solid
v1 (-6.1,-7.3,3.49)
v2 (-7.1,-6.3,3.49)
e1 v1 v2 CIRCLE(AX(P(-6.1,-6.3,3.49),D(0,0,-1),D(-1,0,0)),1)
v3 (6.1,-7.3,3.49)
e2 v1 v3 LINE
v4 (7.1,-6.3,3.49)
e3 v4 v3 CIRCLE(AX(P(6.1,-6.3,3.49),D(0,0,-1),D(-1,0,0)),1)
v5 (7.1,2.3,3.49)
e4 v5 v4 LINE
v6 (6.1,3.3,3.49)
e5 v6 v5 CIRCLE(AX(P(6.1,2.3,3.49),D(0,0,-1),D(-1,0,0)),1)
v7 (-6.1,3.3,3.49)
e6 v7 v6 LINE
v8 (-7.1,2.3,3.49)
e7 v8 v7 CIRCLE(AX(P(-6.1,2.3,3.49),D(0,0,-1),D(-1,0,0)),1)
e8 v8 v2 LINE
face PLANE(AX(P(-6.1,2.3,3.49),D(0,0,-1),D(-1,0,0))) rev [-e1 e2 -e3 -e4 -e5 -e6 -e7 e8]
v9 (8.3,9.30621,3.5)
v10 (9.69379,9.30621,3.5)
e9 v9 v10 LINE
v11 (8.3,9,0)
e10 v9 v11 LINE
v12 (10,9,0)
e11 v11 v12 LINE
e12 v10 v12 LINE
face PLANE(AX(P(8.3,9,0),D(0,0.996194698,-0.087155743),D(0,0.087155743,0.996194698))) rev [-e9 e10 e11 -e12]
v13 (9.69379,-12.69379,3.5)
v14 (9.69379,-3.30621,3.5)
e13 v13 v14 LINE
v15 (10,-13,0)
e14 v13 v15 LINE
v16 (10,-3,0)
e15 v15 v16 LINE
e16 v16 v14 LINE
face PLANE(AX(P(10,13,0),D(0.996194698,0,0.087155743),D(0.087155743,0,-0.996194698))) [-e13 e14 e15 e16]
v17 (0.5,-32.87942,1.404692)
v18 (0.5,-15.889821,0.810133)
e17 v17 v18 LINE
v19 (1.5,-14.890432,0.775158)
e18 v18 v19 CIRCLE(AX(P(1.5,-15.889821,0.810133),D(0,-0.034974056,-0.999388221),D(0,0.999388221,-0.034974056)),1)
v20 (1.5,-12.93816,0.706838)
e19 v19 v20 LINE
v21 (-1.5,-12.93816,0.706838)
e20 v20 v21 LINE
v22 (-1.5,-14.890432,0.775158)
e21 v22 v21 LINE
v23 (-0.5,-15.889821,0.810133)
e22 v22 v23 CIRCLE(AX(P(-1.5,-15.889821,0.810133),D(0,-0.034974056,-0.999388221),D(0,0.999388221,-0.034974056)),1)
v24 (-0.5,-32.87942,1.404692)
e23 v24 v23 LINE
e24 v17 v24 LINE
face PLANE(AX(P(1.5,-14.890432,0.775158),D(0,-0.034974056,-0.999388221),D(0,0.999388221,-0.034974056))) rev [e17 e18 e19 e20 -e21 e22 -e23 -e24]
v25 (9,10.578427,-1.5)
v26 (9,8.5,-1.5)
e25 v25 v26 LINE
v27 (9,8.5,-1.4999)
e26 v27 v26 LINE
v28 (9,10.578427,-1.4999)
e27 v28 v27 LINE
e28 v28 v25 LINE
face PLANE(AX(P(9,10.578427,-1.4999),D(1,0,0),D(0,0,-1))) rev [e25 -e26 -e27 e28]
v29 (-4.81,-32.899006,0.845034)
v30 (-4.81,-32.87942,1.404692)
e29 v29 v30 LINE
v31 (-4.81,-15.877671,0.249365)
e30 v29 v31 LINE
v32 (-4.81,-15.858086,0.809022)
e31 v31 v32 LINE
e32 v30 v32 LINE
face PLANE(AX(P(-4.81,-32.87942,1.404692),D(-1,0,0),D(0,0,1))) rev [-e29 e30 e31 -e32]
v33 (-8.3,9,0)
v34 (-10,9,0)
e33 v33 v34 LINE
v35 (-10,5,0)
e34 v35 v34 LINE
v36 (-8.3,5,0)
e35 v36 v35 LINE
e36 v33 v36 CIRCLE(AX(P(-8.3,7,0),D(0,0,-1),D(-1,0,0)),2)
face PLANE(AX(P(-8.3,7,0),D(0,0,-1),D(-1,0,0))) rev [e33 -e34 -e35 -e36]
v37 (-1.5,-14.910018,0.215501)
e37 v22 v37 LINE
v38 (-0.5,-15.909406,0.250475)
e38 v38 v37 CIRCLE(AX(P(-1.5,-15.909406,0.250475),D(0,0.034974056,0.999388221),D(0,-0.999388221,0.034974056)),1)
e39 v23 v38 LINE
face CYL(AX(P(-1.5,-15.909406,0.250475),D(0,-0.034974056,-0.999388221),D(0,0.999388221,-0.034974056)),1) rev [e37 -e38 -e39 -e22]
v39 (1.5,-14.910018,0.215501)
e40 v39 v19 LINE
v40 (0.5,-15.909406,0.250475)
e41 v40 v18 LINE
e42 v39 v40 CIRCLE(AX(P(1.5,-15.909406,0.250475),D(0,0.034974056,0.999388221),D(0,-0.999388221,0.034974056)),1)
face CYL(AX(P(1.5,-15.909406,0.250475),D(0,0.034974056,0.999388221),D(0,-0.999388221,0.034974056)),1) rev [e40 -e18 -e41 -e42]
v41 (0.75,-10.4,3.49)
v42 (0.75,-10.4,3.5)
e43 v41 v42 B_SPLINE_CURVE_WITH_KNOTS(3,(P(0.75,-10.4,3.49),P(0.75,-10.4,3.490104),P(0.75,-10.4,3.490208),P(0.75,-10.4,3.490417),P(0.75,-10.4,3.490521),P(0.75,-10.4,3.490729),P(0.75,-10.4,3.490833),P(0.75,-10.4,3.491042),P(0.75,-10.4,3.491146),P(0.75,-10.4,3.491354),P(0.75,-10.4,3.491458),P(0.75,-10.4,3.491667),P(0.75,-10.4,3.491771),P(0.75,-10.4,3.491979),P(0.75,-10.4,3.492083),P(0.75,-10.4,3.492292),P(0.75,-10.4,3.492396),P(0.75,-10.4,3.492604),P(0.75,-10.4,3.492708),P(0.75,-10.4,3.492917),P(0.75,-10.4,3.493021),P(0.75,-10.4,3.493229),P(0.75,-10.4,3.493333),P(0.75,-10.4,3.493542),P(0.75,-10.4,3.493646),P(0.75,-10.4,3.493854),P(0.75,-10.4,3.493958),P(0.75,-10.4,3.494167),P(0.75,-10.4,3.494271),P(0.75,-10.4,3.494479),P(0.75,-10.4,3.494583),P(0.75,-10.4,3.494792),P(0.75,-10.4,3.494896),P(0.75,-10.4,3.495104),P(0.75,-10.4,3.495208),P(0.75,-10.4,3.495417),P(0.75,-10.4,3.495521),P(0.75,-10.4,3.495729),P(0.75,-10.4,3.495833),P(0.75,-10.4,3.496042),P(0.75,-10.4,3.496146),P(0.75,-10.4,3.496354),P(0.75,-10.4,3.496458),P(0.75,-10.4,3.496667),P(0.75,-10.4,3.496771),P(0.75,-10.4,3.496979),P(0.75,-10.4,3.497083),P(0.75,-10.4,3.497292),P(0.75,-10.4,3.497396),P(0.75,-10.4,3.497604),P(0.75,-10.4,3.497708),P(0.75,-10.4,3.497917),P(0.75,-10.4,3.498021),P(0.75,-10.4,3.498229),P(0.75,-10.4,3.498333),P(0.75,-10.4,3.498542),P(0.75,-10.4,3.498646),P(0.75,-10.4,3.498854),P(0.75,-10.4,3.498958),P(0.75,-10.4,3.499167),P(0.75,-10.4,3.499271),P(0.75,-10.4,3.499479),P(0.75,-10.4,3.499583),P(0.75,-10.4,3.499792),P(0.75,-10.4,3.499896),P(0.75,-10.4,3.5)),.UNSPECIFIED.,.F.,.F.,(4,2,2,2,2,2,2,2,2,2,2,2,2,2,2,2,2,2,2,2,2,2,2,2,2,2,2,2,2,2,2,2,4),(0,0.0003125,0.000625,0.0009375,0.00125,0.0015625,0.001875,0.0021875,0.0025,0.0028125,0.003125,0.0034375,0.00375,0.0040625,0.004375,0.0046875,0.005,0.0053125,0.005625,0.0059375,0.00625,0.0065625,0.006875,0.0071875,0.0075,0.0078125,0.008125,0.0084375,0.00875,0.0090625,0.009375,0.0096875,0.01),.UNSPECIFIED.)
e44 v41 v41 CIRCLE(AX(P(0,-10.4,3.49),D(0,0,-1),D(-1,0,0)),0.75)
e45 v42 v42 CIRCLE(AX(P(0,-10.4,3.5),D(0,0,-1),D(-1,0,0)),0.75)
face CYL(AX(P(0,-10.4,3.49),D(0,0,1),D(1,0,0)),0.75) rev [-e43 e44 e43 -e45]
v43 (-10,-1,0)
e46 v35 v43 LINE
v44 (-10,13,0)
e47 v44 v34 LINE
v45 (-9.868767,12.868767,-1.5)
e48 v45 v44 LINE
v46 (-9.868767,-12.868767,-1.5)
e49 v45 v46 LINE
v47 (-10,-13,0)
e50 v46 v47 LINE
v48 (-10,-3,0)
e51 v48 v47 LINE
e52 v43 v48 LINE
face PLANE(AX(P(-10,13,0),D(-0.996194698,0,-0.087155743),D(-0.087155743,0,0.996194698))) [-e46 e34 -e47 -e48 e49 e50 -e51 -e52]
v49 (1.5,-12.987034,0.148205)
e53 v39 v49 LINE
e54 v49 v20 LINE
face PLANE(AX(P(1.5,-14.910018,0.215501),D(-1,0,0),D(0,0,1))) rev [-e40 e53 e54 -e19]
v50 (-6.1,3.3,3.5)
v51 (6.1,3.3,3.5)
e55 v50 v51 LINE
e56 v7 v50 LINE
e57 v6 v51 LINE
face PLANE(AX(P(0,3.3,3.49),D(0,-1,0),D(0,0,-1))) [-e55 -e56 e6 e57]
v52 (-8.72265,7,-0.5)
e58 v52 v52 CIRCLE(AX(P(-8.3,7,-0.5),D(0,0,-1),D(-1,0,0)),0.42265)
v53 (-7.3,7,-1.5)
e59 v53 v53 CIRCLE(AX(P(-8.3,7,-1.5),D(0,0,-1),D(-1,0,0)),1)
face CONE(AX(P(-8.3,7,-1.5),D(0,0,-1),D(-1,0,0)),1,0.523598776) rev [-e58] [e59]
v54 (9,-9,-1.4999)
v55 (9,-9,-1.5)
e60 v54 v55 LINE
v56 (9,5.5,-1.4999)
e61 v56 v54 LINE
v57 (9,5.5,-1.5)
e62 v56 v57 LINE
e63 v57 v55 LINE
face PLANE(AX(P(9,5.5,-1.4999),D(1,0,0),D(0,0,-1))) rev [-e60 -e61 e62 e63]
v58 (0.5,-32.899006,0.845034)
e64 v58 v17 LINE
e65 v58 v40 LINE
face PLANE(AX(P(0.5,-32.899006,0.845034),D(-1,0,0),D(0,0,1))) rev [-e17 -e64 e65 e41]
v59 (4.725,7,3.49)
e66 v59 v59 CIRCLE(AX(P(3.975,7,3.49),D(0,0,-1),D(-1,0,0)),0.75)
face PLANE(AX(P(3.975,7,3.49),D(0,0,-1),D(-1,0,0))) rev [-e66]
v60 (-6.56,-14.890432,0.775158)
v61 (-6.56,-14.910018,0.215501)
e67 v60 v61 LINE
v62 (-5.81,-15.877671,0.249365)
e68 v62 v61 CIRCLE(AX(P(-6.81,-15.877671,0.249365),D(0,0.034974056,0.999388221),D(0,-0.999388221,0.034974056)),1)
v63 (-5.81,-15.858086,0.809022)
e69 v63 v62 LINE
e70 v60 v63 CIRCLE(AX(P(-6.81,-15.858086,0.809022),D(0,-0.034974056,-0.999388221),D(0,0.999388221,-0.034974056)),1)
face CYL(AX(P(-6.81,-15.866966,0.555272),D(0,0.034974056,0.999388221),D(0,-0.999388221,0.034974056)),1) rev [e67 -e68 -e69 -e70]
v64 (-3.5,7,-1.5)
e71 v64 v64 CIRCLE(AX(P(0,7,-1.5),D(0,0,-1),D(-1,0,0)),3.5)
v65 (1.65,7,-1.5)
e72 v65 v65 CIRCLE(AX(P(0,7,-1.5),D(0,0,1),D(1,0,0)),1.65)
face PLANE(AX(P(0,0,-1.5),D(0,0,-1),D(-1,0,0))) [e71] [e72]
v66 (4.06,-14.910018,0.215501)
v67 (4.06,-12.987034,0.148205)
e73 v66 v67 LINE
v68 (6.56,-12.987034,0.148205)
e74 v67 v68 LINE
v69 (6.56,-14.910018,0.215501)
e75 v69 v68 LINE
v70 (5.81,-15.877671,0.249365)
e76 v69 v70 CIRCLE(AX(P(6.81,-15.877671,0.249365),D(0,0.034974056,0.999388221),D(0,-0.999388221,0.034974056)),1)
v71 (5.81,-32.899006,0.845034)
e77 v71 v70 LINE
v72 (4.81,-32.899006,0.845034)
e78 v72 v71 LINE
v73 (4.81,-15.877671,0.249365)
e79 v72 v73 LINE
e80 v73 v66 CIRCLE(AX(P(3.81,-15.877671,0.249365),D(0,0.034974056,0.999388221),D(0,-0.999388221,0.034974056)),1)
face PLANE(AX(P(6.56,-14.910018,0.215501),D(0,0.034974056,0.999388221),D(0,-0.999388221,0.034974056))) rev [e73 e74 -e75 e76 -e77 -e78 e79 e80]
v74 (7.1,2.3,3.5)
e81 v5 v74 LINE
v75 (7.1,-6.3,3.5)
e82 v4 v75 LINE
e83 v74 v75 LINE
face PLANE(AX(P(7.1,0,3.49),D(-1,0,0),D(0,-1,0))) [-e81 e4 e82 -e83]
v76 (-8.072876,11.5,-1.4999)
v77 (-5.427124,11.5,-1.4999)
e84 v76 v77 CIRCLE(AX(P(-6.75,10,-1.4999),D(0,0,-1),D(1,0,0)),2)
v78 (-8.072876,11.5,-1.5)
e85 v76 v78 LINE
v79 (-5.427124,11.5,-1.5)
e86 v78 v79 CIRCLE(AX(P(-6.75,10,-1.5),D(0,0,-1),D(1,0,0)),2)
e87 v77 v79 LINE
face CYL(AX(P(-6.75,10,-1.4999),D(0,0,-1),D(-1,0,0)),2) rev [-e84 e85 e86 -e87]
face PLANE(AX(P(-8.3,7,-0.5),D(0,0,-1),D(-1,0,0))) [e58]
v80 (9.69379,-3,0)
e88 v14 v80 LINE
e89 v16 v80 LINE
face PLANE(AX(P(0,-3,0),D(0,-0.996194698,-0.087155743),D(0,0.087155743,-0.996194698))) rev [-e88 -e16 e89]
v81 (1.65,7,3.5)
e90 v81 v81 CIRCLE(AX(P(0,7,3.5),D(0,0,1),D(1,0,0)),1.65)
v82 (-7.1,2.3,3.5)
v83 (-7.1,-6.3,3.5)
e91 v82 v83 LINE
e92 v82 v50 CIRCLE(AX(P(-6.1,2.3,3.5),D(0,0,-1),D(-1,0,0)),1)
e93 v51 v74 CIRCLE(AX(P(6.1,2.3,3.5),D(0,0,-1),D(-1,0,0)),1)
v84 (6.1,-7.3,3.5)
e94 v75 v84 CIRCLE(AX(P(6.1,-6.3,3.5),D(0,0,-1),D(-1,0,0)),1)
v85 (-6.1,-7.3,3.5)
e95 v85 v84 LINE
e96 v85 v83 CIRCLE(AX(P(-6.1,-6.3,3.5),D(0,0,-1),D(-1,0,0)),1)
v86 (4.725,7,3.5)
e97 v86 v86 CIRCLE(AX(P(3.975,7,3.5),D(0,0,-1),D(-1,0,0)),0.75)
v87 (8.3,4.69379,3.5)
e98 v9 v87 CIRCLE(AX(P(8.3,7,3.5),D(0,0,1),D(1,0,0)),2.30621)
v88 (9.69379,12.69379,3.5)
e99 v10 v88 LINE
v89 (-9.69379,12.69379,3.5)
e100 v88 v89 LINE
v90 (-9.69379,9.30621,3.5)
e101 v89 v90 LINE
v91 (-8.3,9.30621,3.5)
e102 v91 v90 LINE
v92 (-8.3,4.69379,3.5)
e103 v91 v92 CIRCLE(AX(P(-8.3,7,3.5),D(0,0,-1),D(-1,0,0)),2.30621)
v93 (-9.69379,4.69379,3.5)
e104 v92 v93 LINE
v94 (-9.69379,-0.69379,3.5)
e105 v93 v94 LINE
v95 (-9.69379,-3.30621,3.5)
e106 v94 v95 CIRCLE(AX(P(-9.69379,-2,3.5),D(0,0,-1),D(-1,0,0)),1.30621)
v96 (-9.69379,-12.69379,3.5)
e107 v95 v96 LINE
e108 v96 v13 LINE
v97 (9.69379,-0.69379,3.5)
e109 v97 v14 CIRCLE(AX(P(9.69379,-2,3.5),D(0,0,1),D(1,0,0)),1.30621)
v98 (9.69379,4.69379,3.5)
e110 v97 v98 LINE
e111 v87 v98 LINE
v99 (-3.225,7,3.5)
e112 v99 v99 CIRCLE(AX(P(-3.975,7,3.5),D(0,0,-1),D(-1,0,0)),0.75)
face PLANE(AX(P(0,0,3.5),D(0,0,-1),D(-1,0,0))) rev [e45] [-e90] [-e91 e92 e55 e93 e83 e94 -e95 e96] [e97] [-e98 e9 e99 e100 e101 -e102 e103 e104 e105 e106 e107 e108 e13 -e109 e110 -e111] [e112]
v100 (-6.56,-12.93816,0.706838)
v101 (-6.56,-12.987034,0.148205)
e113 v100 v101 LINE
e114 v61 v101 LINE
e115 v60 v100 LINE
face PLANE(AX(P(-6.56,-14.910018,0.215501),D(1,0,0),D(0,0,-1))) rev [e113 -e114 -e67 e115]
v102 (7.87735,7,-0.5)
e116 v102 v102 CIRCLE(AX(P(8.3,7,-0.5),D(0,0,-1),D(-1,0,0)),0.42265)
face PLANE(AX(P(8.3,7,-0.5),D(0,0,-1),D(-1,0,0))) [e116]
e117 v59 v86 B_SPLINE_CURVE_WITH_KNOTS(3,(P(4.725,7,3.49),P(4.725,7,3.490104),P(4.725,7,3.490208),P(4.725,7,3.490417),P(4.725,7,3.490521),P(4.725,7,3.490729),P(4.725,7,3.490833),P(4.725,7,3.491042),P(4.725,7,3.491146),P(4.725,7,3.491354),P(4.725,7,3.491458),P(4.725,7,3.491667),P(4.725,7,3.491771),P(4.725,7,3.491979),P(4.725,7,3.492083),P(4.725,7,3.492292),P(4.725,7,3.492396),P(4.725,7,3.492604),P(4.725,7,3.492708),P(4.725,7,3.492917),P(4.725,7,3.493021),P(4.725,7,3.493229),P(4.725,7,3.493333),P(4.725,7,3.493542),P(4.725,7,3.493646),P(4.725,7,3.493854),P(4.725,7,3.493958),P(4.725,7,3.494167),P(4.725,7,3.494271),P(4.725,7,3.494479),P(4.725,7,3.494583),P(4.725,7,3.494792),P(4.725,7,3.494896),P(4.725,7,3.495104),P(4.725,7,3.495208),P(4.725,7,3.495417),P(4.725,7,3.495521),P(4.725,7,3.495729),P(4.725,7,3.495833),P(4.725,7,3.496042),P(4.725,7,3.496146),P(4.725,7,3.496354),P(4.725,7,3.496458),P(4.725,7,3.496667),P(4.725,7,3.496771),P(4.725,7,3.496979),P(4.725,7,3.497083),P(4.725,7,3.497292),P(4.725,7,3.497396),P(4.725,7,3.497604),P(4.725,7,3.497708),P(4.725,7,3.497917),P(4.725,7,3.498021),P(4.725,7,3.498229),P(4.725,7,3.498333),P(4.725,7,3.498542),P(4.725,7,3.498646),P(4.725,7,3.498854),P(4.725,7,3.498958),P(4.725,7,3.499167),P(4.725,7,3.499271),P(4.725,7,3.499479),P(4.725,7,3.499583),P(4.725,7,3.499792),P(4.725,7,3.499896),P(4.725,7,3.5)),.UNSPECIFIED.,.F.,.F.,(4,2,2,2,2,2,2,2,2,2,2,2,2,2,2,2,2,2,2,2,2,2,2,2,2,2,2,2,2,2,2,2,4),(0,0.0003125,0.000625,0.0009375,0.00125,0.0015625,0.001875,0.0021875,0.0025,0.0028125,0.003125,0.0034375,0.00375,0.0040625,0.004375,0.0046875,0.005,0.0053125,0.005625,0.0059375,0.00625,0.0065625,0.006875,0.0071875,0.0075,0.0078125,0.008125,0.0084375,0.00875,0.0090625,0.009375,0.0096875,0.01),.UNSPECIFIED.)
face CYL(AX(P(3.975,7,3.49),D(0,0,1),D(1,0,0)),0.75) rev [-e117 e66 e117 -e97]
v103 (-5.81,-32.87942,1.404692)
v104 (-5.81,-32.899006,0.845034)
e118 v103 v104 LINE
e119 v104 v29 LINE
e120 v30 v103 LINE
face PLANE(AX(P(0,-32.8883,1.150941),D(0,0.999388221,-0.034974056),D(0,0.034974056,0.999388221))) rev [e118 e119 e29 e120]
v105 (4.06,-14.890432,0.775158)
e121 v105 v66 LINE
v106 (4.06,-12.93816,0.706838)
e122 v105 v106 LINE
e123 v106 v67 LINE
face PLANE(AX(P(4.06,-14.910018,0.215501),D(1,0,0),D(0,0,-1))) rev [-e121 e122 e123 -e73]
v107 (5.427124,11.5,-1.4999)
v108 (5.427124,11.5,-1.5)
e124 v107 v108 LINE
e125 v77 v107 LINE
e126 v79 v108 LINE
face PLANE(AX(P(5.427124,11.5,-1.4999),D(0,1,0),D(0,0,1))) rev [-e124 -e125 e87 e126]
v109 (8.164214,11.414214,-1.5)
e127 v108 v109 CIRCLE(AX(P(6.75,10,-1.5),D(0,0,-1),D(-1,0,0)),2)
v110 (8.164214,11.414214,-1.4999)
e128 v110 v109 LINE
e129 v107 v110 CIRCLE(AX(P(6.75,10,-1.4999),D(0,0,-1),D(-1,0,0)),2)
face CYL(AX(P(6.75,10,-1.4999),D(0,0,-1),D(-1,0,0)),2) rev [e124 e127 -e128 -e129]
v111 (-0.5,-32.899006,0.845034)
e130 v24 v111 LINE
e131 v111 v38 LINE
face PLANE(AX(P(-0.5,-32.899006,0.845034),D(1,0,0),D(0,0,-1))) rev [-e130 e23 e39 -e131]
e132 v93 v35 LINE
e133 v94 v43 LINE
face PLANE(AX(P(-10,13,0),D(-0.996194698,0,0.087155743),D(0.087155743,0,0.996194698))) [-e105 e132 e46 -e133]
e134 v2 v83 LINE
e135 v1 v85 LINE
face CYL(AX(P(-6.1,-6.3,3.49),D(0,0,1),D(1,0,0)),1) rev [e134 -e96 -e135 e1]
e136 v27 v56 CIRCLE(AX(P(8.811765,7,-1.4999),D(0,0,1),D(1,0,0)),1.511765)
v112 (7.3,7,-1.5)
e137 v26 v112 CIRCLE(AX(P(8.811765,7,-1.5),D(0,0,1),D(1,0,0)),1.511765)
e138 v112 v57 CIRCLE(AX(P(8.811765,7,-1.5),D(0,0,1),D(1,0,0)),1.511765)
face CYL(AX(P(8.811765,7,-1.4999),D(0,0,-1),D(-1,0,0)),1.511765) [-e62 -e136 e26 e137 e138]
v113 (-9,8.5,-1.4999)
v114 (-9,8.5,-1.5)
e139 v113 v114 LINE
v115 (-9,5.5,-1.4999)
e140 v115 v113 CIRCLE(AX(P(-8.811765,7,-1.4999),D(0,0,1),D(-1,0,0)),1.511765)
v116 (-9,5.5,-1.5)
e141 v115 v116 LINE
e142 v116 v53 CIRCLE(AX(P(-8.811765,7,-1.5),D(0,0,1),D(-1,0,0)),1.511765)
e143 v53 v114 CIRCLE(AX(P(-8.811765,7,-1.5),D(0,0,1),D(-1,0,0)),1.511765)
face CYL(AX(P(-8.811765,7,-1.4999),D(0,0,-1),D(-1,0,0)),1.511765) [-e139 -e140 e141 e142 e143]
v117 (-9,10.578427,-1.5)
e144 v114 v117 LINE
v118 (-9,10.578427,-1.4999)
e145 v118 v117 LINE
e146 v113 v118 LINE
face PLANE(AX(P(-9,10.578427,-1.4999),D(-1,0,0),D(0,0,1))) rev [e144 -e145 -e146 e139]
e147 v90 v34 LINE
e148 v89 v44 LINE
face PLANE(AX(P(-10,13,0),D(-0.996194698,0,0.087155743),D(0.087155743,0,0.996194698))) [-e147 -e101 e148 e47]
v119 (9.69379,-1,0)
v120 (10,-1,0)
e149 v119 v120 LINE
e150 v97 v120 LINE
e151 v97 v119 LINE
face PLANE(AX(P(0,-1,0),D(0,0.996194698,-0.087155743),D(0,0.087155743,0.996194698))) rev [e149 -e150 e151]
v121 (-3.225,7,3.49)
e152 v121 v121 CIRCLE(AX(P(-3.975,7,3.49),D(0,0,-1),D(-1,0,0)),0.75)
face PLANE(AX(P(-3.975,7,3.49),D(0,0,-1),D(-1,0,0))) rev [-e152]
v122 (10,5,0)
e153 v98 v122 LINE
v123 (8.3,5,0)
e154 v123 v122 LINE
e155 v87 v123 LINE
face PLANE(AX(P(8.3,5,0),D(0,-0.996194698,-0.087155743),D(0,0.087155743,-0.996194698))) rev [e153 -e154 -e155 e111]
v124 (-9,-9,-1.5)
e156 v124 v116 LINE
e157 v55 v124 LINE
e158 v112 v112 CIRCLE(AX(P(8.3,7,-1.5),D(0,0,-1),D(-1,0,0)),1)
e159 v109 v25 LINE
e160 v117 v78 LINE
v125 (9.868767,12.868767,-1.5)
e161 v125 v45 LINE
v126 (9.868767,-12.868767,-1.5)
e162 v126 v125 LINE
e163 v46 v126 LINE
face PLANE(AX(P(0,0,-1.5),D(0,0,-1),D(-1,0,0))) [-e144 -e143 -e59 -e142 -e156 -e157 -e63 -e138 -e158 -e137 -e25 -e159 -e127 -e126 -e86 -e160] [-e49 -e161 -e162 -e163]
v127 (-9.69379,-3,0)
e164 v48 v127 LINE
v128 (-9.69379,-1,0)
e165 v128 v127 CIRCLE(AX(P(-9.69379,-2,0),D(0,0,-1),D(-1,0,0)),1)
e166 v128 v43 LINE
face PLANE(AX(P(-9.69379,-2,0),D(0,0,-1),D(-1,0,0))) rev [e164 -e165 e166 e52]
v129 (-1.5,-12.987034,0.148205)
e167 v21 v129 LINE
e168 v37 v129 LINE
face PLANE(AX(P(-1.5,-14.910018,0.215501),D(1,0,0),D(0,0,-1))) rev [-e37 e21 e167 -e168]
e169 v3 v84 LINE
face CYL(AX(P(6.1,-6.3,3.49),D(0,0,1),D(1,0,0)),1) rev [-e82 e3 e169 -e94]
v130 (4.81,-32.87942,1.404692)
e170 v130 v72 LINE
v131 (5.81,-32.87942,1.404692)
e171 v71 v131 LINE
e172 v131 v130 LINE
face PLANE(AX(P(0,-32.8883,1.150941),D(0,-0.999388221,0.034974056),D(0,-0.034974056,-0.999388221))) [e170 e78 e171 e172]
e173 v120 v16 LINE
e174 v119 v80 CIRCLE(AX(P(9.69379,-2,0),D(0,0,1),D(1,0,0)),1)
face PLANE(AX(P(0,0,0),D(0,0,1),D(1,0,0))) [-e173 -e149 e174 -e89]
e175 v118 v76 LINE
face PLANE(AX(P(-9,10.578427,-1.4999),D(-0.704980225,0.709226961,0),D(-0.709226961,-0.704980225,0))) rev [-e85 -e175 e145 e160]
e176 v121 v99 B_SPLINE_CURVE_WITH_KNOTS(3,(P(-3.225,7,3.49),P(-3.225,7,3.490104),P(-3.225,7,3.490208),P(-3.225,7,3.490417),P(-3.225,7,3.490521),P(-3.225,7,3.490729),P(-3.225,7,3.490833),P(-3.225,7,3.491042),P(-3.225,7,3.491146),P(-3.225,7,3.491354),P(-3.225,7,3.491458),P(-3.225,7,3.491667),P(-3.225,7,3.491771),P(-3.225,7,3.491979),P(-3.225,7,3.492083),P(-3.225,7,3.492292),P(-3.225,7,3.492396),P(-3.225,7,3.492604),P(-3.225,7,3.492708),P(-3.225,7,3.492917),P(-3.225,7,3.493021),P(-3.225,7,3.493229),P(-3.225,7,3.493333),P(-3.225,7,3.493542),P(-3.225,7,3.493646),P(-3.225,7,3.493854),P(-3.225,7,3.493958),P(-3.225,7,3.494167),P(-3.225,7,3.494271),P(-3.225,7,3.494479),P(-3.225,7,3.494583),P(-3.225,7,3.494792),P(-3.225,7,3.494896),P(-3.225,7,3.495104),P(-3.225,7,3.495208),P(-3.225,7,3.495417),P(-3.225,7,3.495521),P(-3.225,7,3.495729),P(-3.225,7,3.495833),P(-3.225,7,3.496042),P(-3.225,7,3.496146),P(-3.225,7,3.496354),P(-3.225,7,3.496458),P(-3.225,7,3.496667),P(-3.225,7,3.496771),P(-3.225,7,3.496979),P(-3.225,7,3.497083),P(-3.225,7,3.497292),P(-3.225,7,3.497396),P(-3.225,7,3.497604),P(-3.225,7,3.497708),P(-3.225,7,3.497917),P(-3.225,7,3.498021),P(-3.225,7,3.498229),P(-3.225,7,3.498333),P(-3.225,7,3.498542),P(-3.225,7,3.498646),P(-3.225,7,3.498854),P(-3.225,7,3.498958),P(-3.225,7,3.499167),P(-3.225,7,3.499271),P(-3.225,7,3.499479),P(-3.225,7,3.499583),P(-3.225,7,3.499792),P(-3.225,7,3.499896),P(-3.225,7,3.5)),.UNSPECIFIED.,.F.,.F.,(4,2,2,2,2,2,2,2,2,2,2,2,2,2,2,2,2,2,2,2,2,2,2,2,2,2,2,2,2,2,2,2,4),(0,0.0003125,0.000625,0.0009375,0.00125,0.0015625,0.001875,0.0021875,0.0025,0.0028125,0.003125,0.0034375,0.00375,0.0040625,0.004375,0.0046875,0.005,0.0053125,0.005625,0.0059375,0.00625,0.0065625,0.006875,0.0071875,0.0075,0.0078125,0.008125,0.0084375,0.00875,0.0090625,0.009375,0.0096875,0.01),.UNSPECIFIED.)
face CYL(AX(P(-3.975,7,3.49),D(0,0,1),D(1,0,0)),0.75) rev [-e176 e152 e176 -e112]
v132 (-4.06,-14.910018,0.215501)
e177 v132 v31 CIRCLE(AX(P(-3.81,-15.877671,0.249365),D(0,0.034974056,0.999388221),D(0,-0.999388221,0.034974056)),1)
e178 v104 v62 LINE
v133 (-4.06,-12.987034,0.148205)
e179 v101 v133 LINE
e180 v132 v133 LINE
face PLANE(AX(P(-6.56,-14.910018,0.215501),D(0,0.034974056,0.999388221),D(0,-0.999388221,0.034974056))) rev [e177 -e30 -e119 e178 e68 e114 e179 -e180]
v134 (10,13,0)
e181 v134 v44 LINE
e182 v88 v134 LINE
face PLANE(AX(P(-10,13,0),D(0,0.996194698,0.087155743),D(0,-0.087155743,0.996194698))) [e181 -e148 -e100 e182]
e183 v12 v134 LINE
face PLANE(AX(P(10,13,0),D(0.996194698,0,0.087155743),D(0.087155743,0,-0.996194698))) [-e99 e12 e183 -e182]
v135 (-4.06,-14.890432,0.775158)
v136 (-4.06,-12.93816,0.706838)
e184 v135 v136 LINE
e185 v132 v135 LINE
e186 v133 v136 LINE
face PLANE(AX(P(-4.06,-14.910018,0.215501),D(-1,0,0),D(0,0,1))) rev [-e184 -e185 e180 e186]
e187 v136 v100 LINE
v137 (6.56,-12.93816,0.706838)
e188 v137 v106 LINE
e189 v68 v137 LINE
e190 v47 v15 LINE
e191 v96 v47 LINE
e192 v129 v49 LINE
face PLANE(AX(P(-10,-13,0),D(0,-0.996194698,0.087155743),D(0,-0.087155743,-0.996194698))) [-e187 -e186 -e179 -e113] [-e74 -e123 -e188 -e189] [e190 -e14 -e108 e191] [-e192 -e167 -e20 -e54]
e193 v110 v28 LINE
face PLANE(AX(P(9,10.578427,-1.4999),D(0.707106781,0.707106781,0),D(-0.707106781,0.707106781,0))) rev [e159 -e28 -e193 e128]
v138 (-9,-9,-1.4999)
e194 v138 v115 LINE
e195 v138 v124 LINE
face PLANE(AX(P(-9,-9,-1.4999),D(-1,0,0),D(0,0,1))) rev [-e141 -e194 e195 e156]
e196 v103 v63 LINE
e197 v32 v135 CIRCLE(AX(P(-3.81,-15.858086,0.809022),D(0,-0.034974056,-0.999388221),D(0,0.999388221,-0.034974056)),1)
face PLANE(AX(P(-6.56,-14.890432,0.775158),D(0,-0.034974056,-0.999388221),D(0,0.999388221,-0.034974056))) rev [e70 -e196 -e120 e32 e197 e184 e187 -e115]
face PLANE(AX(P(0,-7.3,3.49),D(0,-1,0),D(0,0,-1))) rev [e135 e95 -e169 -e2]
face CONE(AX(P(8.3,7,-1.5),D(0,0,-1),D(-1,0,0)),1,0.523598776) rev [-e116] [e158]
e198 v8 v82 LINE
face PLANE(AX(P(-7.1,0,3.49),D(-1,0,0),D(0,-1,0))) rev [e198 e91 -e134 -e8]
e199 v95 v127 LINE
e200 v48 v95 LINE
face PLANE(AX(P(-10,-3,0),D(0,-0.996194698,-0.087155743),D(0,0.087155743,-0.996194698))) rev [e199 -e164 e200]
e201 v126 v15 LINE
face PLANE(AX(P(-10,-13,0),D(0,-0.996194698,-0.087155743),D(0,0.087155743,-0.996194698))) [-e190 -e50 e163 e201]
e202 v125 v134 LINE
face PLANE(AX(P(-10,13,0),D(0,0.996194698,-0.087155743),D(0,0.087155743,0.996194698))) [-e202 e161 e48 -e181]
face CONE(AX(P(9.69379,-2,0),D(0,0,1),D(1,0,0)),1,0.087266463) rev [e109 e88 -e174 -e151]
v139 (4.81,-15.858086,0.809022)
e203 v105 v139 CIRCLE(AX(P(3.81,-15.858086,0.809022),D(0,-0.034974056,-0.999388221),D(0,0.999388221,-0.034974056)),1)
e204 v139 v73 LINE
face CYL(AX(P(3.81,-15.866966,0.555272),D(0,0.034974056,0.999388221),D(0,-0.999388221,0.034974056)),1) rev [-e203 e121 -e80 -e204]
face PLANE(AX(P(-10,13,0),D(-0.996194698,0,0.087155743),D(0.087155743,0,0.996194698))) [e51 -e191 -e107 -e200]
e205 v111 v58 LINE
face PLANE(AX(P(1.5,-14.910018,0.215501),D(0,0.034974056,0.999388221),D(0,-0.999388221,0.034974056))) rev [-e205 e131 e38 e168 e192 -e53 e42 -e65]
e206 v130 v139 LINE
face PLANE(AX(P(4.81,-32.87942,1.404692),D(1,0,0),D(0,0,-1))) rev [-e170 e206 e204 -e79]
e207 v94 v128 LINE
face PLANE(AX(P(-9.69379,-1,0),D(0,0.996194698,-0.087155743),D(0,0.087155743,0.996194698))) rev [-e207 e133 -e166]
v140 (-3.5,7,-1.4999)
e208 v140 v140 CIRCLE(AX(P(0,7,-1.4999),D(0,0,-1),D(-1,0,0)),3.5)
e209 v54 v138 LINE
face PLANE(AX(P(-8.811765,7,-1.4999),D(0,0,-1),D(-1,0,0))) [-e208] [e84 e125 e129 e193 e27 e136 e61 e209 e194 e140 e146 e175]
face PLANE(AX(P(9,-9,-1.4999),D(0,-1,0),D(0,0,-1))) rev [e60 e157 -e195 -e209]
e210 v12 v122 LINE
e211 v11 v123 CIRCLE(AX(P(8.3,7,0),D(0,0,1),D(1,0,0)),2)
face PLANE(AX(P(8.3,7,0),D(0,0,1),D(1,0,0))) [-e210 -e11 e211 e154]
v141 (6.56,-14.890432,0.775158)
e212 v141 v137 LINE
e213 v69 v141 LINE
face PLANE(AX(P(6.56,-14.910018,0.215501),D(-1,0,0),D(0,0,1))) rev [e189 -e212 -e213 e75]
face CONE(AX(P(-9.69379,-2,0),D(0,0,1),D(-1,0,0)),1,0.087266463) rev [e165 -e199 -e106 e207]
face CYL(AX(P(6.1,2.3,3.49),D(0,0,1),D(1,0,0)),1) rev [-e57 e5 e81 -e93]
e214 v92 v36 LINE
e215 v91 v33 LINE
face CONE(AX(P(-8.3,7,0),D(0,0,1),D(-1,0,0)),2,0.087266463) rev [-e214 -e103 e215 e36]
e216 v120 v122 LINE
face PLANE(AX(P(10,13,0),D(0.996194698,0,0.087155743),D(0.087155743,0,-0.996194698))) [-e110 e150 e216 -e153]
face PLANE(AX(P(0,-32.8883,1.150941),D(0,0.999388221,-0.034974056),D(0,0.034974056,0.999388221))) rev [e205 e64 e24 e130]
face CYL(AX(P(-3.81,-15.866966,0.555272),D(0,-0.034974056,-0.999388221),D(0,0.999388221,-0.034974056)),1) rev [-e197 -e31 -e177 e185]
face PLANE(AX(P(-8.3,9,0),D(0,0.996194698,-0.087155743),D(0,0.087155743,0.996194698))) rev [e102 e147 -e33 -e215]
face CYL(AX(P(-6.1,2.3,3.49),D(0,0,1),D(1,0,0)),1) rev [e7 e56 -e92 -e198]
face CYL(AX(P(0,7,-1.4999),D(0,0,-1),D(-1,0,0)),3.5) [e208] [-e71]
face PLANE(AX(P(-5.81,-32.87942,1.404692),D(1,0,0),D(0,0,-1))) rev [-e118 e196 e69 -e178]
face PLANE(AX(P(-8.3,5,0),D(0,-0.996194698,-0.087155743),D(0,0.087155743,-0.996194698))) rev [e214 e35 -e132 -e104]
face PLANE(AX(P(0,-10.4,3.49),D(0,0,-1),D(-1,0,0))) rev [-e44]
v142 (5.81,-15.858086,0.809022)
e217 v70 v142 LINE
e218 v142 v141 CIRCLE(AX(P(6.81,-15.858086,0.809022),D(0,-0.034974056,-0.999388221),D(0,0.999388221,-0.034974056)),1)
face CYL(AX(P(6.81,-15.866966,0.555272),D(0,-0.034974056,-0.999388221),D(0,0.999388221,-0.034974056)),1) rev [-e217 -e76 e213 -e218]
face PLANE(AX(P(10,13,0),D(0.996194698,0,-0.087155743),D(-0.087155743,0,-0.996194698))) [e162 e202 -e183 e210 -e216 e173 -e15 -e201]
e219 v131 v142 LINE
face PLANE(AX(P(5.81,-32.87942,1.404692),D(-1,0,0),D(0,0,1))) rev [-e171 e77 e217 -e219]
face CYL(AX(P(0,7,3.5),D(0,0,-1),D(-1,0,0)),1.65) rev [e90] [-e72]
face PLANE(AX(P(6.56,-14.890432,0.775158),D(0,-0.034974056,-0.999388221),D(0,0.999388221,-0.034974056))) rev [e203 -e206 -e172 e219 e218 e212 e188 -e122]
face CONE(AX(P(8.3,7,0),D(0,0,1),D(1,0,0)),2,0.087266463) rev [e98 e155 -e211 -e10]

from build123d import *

# Parameters (mm, degrees)
SKETCH1_W                    = 20
SKETCH1_H                    = 26
BOSS_EXTRUDE1_DEPTH          = 1.5
BOSS_EXTRUDE1_DRAFT          = -5
SKETCH1_2_W                  = 20
SKETCH1_2_H                  = 26
BOSS_EXTRUDE2_DEPTH          = 3.5
BOSS_EXTRUDE2_TAPER          = 5
CUT_EXTRUDE1_DEPTH           = 3.5
CUT_EXTRUDE1_TAPER           = -5
CUT_EXTRUDE1_2_DEPTH         = 3.5
CUT_EXTRUDE1_2_TAPER         = -5
CUT_EXTRUDE1_3_DEPTH         = 3.5
CUT_EXTRUDE1_3_TAPER         = -5
CUT_EXTRUDE1_4_DEPTH         = 3.5
CUT_EXTRUDE1_4_TAPER         = -5
CUT_EXTRUDE3_DEPTH           = 17.770509989
CUT_EXTRUDE3_DEPTH_BACK      = 17.770509989
SKETCH5_5_R                  = 1.65
CUT_EXTRUDE4_START           = 3.5
SKETCH5_8_R                  = 0.75
CUT_EXTRUDE4_DEPTH           = 0.01
CUT_EXTRUDE5_START           = -1.5
SKETCH5_9_R                  = 1
CUT_EXTRUDE5_DEPTH           = 1
CUT_EXTRUDE5_DRAFT           = 30
CUT_EXTRUDE5_PROFILE_2_DEPTH = 1
CUT_EXTRUDE5_PROFILE_2_DRAFT = 30
SKETCH6_R                    = 3.5
CUT_EXTRUDE6_DEPTH           = 0.0001
SKETCH7_W                    = 3
SKETCH7_H                    = 0.56
SKETCH7_W_2                  = 2.5
BOSS_EXTRUDE3_DEPTH          = 2.1
SKETCH8_W                    = 1
SKETCH8_H                    = 0.56
BOSS_EXTRUDE4_DEPTH          = 18
FILLET1_R                    = 1


# Read off the part's stored shape, not the designer's step: Cut-Extrude1
with BuildPart() as part:
    # Sketch1 → Boss-Extrude1 (with draft: the straight prism first)
    with BuildSketch(Plane.XY):
        Rectangle(SKETCH1_W, SKETCH1_H)
    extrude(amount=-BOSS_EXTRUDE1_DEPTH)
    # Boss-Extrude1: the draft: its side faces are tilted about the plane it starts from
    boss_extrude1_sides = [part.faces().sort_by_distance(p)[0] for p in [
        (-10, 0, -0.75),
        (0, -13, -0.75),
        (10, 0, -0.75),
        (0, 13, -0.75),
    ]]
    draft(boss_extrude1_sides, Plane.XY, BOSS_EXTRUDE1_DRAFT)

    # Sketch1<2> → Boss-Extrude2 (add)
    with BuildSketch(Plane.XY):
        Rectangle(SKETCH1_2_W, SKETCH1_2_H)
    extrude(amount=BOSS_EXTRUDE2_DEPTH, taper=BOSS_EXTRUDE2_TAPER)

    # Cut-Extrude1 outline → Cut-Extrude1 (cut)
    with BuildSketch(Plane.XY):
        with BuildLine():
            Line((10, -1), (9.693789678, -1))
            ThreePointArc((9.693789678, -1), (8.693789678, -2), (9.693789678, -3))
            Line((9.693789678, -3), (10, -3))
            Line((10, -3), (10, -1))
        make_face()
    extrude(amount=CUT_EXTRUDE1_DEPTH, taper=CUT_EXTRUDE1_TAPER, mode=Mode.SUBTRACT)

    # Cut-Extrude1 2 outline → Cut-Extrude1 2 (cut)
    with BuildSketch(Plane.XY):
        with BuildLine():
            Line((-9.693789678, -1), (-10, -1))
            Line((-10, -1), (-10, -3))
            Line((-10, -3), (-9.693789678, -3))
            ThreePointArc((-9.693789678, -3), (-8.693789678, -2), (-9.693789678, -1))
        make_face()
    extrude(amount=CUT_EXTRUDE1_2_DEPTH, taper=CUT_EXTRUDE1_2_TAPER, mode=Mode.SUBTRACT)

    # Cut-Extrude1 3 outline → Cut-Extrude1 3 (cut)
    with BuildSketch(Plane.XY):
        with BuildLine():
            Line((-8.3, 9), (-10, 9))
            Line((-10, 9), (-10, 5))
            Line((-10, 5), (-8.3, 5))
            ThreePointArc((-8.3, 5), (-6.3, 7), (-8.3, 9))
        make_face()
    extrude(amount=CUT_EXTRUDE1_3_DEPTH, taper=CUT_EXTRUDE1_3_TAPER, mode=Mode.SUBTRACT)

    # Cut-Extrude1 4 outline → Cut-Extrude1 4 (cut)
    with BuildSketch(Plane.XY):
        with BuildLine():
            Line((10, 9), (8.3, 9))
            ThreePointArc((8.3, 9), (6.3, 7), (8.3, 5))
            Line((8.3, 5), (10, 5))
            Line((10, 5), (10, 9))
        make_face()
    extrude(amount=CUT_EXTRUDE1_4_DEPTH, taper=CUT_EXTRUDE1_4_TAPER, mode=Mode.SUBTRACT)

    # Sketch5<5> → Cut-Extrude3 (cut, two sides: drawn at the far end of the back side and taken through both)
    with BuildSketch(Plane.XY.offset(-CUT_EXTRUDE3_DEPTH_BACK)):
        with Locations((0, 7)):
            Circle(SKETCH5_5_R)
    extrude(amount=CUT_EXTRUDE3_DEPTH + CUT_EXTRUDE3_DEPTH_BACK, mode=Mode.SUBTRACT)

    # Sketch5<8> → Cut-Extrude4 (cut)
    with BuildSketch(Plane.XY.offset(CUT_EXTRUDE4_START)):
        with Locations((3.975, 7)):
            Circle(SKETCH5_8_R)
        with Locations((-3.975, 7)):
            Circle(SKETCH5_8_R)
        with Locations((0, -10.4)):
            Circle(SKETCH5_8_R)
        with BuildLine():
            Line((-6.1, 3.3), (6.1, 3.3))
            ThreePointArc((6.1, 3.3), (6.807106781, 3.007106781), (7.1, 2.3))
            Line((7.1, 2.3), (7.1, -6.3))
            ThreePointArc((7.1, -6.3), (6.807106781, -7.007106781), (6.1, -7.3))
            Line((6.1, -7.3), (-6.1, -7.3))
            ThreePointArc((-6.1, -7.3), (-6.807106781, -7.007106781), (-7.1, -6.3))
            Line((-7.1, -6.3), (-7.1, 2.3))
            ThreePointArc((-7.1, 2.3), (-6.807106781, 3.007106781), (-6.1, 3.3))
        make_face()
    extrude(amount=-CUT_EXTRUDE4_DEPTH, mode=Mode.SUBTRACT)


with BuildPart() as cut_extrude5_tool:
    # Sketch5<9> → Cut-Extrude5 (with draft: the straight prism first)
    with BuildSketch(Plane.XY.offset(CUT_EXTRUDE5_START)):
        with Locations((8.3, 7)):
            Circle(SKETCH5_9_R)
    extrude(amount=CUT_EXTRUDE5_DEPTH)
    # Cut-Extrude5: the draft: its side faces are tilted about the plane it starts from
    cut_extrude5_sides = [cut_extrude5_tool.faces().sort_by_distance(p)[0] for p in [
        (7.3, 7, -1),
    ]]
    draft(cut_extrude5_sides, Plane.XY.offset(CUT_EXTRUDE5_START), CUT_EXTRUDE5_DRAFT)


with BuildPart() as part_1:
    add(part.part)

    # Cut-Extrude5: cut by cut_extrude5_tool
    add(cut_extrude5_tool.part, mode=Mode.SUBTRACT)


with BuildPart() as cut_extrude5_profile_2_tool:
    # Sketch5<9> → Cut-Extrude5 profile 2 (with draft: the straight prism first)
    with BuildSketch(Plane.XY.offset(CUT_EXTRUDE5_START)):
        with Locations((-8.3, 7)):
            Circle(SKETCH5_9_R)
    extrude(amount=CUT_EXTRUDE5_PROFILE_2_DEPTH)
    # Cut-Extrude5 profile 2: the draft: its side faces are tilted about the plane it starts from
    cut_extrude5_profile_2_sides = [cut_extrude5_profile_2_tool.faces().sort_by_distance(p)[0] for p in [
        (-9.3, 7, -1),
    ]]
    draft(cut_extrude5_profile_2_sides, Plane.XY.offset(CUT_EXTRUDE5_START), CUT_EXTRUDE5_PROFILE_2_DRAFT)


with BuildPart() as part_2:
    add(part_1.part)

    # Cut-Extrude5 profile 2: cut by cut_extrude5_profile_2_tool
    add(cut_extrude5_profile_2_tool.part, mode=Mode.SUBTRACT)

    # Sketch6 → Cut-Extrude6 (cut)
    with BuildSketch(Plane(origin=(0, 0, -1.5), x_dir=(-1, 0, 0), z_dir=(0, 0, -1))):
        with BuildLine():
            Line((-5.427124344, 11.5), (5.427124344, 11.5))
            ThreePointArc((5.427124344, 11.5), (6.75, 12), (8.072875656, 11.5))
            Line((8.072875656, 11.5), (9, 10.578427125))
            Line((9, 10.578427125), (9, 8.5))
            ThreePointArc((9, 8.5), (7.3, 7), (9, 5.5))
            Line((9, 5.5), (9, -9))
            Line((9, -9), (-9, -9))
            Line((-9, -9), (-9, 5.5))
            ThreePointArc((-9, 5.5), (-7.3, 7), (-9, 8.5))
            Line((-9, 8.5), (-9, 10.578427125))
            Line((-9, 10.578427125), (-8.164213562, 11.414213562))
            ThreePointArc((-8.164213562, 11.414213562), (-6.812653663, 11.999018389), (-5.427124344, 11.5))
        make_face()
        with Locations((0, 7)):
            Circle(SKETCH6_R, mode=Mode.SUBTRACT)
    extrude(amount=-CUT_EXTRUDE6_DEPTH, mode=Mode.SUBTRACT)

    # Sketch7 → Boss-Extrude3 (add)
    with BuildSketch(Plane(origin=(0, -12.800597138, 0.447962854), x_dir=(-1, 0, 0), z_dir=(0, -0.9993882205697596, 0.034974055904479696))):
        with Locations((0, 0.026094538)):
            Rectangle(SKETCH7_W, SKETCH7_H)
        with Locations((-5.31, 0.026094538)):
            Rectangle(SKETCH7_W_2, SKETCH7_H)
        with Locations((5.31, 0.026094538)):
            Rectangle(SKETCH7_W_2, SKETCH7_H)
    extrude(amount=BOSS_EXTRUDE3_DEPTH)

    # Sketch8 → Boss-Extrude4 (add)
    with BuildSketch(Plane(origin=(0, -14.899312401, 0.521408372), x_dir=(1, 0, 0), z_dir=(0, -0.9993882205697596, 0.03497405590447946))):
        with Locations((5.31, -0.026094538)):
            Rectangle(SKETCH8_W, SKETCH8_H)
        with Locations((0, -0.026094538)):
            Rectangle(SKETCH8_W, SKETCH8_H)
        with Locations((-5.31, -0.026094538)):
            Rectangle(SKETCH8_W, SKETCH8_H)
    extrude(amount=BOSS_EXTRUDE4_DEPTH)

    # Fillet1
    # the kernel refuses this fillet: 1 mm, written as the material it adds along each edge
    with BuildSketch(Plane(origin=(4.81, -14.910017769, 0.215501096), x_dir=(-1, 0, 0), z_dir=(0, 0.03497405590447946, 0.9993882205697596)), Plane(origin=(5.81, -14.890432297, 0.7751585), x_dir=(1, 0, 0), z_dir=(0, -0.03497405590447946, -0.9993882205697596)), Plane(origin=(-5.81, -14.910017769, 0.215501096), x_dir=(-1, 0, 0), z_dir=(0, 0.03497405590447946, 0.9993882205697596)), Plane(origin=(-4.81, -14.890432297, 0.7751585), x_dir=(1, 0, 0), z_dir=(0, -0.03497405590447946, -0.9993882205697596))) as fillet1_piece_1:
        with BuildLine():
            CenterArc((1, 0.968245837), FILLET1_R, 180, 75.522487814)
            Line((0, 0.968245837), (-0.02, 0.968245837))
            Line((-0.02, 0.968245837), (-0.02, 0))
            Line((-0.02, 0), (0, -0.02))
            ThreePointArc((0, -0.02), (0.375, -0.02), (0.745, -0.019364917))
            Line((0.745, -0.019364917), (0.75, 0))
        make_face()
    extrude(amount=0.56)
    with BuildSketch(Plane(origin=(0.5, -14.910017769, 0.215501096), x_dir=(1, 0, 0), z_dir=(0, 0.03497405590447946, 0.9993882205697596)), Plane(origin=(-0.5, -14.890432297, 0.7751585), x_dir=(-1, 0, 0), z_dir=(0, -0.03497405590447946, -0.9993882205697596))) as fillet1_piece_2:
        with BuildLine():
            CenterArc((FILLET1_R, -FILLET1_R), FILLET1_R, 90, 90)
            Line((0, -FILLET1_R), (-FILLET1_R * 0.02, -FILLET1_R))
            Line((-FILLET1_R * 0.02, -FILLET1_R), (-FILLET1_R * 0.02, FILLET1_R * 0.02))
            Line((-FILLET1_R * 0.02, FILLET1_R * 0.02), (FILLET1_R, FILLET1_R * 0.02))
            Line((FILLET1_R, FILLET1_R * 0.02), (FILLET1_R, 0))
        make_face()
    extrude(amount=0.56)


solid = part_2.part
